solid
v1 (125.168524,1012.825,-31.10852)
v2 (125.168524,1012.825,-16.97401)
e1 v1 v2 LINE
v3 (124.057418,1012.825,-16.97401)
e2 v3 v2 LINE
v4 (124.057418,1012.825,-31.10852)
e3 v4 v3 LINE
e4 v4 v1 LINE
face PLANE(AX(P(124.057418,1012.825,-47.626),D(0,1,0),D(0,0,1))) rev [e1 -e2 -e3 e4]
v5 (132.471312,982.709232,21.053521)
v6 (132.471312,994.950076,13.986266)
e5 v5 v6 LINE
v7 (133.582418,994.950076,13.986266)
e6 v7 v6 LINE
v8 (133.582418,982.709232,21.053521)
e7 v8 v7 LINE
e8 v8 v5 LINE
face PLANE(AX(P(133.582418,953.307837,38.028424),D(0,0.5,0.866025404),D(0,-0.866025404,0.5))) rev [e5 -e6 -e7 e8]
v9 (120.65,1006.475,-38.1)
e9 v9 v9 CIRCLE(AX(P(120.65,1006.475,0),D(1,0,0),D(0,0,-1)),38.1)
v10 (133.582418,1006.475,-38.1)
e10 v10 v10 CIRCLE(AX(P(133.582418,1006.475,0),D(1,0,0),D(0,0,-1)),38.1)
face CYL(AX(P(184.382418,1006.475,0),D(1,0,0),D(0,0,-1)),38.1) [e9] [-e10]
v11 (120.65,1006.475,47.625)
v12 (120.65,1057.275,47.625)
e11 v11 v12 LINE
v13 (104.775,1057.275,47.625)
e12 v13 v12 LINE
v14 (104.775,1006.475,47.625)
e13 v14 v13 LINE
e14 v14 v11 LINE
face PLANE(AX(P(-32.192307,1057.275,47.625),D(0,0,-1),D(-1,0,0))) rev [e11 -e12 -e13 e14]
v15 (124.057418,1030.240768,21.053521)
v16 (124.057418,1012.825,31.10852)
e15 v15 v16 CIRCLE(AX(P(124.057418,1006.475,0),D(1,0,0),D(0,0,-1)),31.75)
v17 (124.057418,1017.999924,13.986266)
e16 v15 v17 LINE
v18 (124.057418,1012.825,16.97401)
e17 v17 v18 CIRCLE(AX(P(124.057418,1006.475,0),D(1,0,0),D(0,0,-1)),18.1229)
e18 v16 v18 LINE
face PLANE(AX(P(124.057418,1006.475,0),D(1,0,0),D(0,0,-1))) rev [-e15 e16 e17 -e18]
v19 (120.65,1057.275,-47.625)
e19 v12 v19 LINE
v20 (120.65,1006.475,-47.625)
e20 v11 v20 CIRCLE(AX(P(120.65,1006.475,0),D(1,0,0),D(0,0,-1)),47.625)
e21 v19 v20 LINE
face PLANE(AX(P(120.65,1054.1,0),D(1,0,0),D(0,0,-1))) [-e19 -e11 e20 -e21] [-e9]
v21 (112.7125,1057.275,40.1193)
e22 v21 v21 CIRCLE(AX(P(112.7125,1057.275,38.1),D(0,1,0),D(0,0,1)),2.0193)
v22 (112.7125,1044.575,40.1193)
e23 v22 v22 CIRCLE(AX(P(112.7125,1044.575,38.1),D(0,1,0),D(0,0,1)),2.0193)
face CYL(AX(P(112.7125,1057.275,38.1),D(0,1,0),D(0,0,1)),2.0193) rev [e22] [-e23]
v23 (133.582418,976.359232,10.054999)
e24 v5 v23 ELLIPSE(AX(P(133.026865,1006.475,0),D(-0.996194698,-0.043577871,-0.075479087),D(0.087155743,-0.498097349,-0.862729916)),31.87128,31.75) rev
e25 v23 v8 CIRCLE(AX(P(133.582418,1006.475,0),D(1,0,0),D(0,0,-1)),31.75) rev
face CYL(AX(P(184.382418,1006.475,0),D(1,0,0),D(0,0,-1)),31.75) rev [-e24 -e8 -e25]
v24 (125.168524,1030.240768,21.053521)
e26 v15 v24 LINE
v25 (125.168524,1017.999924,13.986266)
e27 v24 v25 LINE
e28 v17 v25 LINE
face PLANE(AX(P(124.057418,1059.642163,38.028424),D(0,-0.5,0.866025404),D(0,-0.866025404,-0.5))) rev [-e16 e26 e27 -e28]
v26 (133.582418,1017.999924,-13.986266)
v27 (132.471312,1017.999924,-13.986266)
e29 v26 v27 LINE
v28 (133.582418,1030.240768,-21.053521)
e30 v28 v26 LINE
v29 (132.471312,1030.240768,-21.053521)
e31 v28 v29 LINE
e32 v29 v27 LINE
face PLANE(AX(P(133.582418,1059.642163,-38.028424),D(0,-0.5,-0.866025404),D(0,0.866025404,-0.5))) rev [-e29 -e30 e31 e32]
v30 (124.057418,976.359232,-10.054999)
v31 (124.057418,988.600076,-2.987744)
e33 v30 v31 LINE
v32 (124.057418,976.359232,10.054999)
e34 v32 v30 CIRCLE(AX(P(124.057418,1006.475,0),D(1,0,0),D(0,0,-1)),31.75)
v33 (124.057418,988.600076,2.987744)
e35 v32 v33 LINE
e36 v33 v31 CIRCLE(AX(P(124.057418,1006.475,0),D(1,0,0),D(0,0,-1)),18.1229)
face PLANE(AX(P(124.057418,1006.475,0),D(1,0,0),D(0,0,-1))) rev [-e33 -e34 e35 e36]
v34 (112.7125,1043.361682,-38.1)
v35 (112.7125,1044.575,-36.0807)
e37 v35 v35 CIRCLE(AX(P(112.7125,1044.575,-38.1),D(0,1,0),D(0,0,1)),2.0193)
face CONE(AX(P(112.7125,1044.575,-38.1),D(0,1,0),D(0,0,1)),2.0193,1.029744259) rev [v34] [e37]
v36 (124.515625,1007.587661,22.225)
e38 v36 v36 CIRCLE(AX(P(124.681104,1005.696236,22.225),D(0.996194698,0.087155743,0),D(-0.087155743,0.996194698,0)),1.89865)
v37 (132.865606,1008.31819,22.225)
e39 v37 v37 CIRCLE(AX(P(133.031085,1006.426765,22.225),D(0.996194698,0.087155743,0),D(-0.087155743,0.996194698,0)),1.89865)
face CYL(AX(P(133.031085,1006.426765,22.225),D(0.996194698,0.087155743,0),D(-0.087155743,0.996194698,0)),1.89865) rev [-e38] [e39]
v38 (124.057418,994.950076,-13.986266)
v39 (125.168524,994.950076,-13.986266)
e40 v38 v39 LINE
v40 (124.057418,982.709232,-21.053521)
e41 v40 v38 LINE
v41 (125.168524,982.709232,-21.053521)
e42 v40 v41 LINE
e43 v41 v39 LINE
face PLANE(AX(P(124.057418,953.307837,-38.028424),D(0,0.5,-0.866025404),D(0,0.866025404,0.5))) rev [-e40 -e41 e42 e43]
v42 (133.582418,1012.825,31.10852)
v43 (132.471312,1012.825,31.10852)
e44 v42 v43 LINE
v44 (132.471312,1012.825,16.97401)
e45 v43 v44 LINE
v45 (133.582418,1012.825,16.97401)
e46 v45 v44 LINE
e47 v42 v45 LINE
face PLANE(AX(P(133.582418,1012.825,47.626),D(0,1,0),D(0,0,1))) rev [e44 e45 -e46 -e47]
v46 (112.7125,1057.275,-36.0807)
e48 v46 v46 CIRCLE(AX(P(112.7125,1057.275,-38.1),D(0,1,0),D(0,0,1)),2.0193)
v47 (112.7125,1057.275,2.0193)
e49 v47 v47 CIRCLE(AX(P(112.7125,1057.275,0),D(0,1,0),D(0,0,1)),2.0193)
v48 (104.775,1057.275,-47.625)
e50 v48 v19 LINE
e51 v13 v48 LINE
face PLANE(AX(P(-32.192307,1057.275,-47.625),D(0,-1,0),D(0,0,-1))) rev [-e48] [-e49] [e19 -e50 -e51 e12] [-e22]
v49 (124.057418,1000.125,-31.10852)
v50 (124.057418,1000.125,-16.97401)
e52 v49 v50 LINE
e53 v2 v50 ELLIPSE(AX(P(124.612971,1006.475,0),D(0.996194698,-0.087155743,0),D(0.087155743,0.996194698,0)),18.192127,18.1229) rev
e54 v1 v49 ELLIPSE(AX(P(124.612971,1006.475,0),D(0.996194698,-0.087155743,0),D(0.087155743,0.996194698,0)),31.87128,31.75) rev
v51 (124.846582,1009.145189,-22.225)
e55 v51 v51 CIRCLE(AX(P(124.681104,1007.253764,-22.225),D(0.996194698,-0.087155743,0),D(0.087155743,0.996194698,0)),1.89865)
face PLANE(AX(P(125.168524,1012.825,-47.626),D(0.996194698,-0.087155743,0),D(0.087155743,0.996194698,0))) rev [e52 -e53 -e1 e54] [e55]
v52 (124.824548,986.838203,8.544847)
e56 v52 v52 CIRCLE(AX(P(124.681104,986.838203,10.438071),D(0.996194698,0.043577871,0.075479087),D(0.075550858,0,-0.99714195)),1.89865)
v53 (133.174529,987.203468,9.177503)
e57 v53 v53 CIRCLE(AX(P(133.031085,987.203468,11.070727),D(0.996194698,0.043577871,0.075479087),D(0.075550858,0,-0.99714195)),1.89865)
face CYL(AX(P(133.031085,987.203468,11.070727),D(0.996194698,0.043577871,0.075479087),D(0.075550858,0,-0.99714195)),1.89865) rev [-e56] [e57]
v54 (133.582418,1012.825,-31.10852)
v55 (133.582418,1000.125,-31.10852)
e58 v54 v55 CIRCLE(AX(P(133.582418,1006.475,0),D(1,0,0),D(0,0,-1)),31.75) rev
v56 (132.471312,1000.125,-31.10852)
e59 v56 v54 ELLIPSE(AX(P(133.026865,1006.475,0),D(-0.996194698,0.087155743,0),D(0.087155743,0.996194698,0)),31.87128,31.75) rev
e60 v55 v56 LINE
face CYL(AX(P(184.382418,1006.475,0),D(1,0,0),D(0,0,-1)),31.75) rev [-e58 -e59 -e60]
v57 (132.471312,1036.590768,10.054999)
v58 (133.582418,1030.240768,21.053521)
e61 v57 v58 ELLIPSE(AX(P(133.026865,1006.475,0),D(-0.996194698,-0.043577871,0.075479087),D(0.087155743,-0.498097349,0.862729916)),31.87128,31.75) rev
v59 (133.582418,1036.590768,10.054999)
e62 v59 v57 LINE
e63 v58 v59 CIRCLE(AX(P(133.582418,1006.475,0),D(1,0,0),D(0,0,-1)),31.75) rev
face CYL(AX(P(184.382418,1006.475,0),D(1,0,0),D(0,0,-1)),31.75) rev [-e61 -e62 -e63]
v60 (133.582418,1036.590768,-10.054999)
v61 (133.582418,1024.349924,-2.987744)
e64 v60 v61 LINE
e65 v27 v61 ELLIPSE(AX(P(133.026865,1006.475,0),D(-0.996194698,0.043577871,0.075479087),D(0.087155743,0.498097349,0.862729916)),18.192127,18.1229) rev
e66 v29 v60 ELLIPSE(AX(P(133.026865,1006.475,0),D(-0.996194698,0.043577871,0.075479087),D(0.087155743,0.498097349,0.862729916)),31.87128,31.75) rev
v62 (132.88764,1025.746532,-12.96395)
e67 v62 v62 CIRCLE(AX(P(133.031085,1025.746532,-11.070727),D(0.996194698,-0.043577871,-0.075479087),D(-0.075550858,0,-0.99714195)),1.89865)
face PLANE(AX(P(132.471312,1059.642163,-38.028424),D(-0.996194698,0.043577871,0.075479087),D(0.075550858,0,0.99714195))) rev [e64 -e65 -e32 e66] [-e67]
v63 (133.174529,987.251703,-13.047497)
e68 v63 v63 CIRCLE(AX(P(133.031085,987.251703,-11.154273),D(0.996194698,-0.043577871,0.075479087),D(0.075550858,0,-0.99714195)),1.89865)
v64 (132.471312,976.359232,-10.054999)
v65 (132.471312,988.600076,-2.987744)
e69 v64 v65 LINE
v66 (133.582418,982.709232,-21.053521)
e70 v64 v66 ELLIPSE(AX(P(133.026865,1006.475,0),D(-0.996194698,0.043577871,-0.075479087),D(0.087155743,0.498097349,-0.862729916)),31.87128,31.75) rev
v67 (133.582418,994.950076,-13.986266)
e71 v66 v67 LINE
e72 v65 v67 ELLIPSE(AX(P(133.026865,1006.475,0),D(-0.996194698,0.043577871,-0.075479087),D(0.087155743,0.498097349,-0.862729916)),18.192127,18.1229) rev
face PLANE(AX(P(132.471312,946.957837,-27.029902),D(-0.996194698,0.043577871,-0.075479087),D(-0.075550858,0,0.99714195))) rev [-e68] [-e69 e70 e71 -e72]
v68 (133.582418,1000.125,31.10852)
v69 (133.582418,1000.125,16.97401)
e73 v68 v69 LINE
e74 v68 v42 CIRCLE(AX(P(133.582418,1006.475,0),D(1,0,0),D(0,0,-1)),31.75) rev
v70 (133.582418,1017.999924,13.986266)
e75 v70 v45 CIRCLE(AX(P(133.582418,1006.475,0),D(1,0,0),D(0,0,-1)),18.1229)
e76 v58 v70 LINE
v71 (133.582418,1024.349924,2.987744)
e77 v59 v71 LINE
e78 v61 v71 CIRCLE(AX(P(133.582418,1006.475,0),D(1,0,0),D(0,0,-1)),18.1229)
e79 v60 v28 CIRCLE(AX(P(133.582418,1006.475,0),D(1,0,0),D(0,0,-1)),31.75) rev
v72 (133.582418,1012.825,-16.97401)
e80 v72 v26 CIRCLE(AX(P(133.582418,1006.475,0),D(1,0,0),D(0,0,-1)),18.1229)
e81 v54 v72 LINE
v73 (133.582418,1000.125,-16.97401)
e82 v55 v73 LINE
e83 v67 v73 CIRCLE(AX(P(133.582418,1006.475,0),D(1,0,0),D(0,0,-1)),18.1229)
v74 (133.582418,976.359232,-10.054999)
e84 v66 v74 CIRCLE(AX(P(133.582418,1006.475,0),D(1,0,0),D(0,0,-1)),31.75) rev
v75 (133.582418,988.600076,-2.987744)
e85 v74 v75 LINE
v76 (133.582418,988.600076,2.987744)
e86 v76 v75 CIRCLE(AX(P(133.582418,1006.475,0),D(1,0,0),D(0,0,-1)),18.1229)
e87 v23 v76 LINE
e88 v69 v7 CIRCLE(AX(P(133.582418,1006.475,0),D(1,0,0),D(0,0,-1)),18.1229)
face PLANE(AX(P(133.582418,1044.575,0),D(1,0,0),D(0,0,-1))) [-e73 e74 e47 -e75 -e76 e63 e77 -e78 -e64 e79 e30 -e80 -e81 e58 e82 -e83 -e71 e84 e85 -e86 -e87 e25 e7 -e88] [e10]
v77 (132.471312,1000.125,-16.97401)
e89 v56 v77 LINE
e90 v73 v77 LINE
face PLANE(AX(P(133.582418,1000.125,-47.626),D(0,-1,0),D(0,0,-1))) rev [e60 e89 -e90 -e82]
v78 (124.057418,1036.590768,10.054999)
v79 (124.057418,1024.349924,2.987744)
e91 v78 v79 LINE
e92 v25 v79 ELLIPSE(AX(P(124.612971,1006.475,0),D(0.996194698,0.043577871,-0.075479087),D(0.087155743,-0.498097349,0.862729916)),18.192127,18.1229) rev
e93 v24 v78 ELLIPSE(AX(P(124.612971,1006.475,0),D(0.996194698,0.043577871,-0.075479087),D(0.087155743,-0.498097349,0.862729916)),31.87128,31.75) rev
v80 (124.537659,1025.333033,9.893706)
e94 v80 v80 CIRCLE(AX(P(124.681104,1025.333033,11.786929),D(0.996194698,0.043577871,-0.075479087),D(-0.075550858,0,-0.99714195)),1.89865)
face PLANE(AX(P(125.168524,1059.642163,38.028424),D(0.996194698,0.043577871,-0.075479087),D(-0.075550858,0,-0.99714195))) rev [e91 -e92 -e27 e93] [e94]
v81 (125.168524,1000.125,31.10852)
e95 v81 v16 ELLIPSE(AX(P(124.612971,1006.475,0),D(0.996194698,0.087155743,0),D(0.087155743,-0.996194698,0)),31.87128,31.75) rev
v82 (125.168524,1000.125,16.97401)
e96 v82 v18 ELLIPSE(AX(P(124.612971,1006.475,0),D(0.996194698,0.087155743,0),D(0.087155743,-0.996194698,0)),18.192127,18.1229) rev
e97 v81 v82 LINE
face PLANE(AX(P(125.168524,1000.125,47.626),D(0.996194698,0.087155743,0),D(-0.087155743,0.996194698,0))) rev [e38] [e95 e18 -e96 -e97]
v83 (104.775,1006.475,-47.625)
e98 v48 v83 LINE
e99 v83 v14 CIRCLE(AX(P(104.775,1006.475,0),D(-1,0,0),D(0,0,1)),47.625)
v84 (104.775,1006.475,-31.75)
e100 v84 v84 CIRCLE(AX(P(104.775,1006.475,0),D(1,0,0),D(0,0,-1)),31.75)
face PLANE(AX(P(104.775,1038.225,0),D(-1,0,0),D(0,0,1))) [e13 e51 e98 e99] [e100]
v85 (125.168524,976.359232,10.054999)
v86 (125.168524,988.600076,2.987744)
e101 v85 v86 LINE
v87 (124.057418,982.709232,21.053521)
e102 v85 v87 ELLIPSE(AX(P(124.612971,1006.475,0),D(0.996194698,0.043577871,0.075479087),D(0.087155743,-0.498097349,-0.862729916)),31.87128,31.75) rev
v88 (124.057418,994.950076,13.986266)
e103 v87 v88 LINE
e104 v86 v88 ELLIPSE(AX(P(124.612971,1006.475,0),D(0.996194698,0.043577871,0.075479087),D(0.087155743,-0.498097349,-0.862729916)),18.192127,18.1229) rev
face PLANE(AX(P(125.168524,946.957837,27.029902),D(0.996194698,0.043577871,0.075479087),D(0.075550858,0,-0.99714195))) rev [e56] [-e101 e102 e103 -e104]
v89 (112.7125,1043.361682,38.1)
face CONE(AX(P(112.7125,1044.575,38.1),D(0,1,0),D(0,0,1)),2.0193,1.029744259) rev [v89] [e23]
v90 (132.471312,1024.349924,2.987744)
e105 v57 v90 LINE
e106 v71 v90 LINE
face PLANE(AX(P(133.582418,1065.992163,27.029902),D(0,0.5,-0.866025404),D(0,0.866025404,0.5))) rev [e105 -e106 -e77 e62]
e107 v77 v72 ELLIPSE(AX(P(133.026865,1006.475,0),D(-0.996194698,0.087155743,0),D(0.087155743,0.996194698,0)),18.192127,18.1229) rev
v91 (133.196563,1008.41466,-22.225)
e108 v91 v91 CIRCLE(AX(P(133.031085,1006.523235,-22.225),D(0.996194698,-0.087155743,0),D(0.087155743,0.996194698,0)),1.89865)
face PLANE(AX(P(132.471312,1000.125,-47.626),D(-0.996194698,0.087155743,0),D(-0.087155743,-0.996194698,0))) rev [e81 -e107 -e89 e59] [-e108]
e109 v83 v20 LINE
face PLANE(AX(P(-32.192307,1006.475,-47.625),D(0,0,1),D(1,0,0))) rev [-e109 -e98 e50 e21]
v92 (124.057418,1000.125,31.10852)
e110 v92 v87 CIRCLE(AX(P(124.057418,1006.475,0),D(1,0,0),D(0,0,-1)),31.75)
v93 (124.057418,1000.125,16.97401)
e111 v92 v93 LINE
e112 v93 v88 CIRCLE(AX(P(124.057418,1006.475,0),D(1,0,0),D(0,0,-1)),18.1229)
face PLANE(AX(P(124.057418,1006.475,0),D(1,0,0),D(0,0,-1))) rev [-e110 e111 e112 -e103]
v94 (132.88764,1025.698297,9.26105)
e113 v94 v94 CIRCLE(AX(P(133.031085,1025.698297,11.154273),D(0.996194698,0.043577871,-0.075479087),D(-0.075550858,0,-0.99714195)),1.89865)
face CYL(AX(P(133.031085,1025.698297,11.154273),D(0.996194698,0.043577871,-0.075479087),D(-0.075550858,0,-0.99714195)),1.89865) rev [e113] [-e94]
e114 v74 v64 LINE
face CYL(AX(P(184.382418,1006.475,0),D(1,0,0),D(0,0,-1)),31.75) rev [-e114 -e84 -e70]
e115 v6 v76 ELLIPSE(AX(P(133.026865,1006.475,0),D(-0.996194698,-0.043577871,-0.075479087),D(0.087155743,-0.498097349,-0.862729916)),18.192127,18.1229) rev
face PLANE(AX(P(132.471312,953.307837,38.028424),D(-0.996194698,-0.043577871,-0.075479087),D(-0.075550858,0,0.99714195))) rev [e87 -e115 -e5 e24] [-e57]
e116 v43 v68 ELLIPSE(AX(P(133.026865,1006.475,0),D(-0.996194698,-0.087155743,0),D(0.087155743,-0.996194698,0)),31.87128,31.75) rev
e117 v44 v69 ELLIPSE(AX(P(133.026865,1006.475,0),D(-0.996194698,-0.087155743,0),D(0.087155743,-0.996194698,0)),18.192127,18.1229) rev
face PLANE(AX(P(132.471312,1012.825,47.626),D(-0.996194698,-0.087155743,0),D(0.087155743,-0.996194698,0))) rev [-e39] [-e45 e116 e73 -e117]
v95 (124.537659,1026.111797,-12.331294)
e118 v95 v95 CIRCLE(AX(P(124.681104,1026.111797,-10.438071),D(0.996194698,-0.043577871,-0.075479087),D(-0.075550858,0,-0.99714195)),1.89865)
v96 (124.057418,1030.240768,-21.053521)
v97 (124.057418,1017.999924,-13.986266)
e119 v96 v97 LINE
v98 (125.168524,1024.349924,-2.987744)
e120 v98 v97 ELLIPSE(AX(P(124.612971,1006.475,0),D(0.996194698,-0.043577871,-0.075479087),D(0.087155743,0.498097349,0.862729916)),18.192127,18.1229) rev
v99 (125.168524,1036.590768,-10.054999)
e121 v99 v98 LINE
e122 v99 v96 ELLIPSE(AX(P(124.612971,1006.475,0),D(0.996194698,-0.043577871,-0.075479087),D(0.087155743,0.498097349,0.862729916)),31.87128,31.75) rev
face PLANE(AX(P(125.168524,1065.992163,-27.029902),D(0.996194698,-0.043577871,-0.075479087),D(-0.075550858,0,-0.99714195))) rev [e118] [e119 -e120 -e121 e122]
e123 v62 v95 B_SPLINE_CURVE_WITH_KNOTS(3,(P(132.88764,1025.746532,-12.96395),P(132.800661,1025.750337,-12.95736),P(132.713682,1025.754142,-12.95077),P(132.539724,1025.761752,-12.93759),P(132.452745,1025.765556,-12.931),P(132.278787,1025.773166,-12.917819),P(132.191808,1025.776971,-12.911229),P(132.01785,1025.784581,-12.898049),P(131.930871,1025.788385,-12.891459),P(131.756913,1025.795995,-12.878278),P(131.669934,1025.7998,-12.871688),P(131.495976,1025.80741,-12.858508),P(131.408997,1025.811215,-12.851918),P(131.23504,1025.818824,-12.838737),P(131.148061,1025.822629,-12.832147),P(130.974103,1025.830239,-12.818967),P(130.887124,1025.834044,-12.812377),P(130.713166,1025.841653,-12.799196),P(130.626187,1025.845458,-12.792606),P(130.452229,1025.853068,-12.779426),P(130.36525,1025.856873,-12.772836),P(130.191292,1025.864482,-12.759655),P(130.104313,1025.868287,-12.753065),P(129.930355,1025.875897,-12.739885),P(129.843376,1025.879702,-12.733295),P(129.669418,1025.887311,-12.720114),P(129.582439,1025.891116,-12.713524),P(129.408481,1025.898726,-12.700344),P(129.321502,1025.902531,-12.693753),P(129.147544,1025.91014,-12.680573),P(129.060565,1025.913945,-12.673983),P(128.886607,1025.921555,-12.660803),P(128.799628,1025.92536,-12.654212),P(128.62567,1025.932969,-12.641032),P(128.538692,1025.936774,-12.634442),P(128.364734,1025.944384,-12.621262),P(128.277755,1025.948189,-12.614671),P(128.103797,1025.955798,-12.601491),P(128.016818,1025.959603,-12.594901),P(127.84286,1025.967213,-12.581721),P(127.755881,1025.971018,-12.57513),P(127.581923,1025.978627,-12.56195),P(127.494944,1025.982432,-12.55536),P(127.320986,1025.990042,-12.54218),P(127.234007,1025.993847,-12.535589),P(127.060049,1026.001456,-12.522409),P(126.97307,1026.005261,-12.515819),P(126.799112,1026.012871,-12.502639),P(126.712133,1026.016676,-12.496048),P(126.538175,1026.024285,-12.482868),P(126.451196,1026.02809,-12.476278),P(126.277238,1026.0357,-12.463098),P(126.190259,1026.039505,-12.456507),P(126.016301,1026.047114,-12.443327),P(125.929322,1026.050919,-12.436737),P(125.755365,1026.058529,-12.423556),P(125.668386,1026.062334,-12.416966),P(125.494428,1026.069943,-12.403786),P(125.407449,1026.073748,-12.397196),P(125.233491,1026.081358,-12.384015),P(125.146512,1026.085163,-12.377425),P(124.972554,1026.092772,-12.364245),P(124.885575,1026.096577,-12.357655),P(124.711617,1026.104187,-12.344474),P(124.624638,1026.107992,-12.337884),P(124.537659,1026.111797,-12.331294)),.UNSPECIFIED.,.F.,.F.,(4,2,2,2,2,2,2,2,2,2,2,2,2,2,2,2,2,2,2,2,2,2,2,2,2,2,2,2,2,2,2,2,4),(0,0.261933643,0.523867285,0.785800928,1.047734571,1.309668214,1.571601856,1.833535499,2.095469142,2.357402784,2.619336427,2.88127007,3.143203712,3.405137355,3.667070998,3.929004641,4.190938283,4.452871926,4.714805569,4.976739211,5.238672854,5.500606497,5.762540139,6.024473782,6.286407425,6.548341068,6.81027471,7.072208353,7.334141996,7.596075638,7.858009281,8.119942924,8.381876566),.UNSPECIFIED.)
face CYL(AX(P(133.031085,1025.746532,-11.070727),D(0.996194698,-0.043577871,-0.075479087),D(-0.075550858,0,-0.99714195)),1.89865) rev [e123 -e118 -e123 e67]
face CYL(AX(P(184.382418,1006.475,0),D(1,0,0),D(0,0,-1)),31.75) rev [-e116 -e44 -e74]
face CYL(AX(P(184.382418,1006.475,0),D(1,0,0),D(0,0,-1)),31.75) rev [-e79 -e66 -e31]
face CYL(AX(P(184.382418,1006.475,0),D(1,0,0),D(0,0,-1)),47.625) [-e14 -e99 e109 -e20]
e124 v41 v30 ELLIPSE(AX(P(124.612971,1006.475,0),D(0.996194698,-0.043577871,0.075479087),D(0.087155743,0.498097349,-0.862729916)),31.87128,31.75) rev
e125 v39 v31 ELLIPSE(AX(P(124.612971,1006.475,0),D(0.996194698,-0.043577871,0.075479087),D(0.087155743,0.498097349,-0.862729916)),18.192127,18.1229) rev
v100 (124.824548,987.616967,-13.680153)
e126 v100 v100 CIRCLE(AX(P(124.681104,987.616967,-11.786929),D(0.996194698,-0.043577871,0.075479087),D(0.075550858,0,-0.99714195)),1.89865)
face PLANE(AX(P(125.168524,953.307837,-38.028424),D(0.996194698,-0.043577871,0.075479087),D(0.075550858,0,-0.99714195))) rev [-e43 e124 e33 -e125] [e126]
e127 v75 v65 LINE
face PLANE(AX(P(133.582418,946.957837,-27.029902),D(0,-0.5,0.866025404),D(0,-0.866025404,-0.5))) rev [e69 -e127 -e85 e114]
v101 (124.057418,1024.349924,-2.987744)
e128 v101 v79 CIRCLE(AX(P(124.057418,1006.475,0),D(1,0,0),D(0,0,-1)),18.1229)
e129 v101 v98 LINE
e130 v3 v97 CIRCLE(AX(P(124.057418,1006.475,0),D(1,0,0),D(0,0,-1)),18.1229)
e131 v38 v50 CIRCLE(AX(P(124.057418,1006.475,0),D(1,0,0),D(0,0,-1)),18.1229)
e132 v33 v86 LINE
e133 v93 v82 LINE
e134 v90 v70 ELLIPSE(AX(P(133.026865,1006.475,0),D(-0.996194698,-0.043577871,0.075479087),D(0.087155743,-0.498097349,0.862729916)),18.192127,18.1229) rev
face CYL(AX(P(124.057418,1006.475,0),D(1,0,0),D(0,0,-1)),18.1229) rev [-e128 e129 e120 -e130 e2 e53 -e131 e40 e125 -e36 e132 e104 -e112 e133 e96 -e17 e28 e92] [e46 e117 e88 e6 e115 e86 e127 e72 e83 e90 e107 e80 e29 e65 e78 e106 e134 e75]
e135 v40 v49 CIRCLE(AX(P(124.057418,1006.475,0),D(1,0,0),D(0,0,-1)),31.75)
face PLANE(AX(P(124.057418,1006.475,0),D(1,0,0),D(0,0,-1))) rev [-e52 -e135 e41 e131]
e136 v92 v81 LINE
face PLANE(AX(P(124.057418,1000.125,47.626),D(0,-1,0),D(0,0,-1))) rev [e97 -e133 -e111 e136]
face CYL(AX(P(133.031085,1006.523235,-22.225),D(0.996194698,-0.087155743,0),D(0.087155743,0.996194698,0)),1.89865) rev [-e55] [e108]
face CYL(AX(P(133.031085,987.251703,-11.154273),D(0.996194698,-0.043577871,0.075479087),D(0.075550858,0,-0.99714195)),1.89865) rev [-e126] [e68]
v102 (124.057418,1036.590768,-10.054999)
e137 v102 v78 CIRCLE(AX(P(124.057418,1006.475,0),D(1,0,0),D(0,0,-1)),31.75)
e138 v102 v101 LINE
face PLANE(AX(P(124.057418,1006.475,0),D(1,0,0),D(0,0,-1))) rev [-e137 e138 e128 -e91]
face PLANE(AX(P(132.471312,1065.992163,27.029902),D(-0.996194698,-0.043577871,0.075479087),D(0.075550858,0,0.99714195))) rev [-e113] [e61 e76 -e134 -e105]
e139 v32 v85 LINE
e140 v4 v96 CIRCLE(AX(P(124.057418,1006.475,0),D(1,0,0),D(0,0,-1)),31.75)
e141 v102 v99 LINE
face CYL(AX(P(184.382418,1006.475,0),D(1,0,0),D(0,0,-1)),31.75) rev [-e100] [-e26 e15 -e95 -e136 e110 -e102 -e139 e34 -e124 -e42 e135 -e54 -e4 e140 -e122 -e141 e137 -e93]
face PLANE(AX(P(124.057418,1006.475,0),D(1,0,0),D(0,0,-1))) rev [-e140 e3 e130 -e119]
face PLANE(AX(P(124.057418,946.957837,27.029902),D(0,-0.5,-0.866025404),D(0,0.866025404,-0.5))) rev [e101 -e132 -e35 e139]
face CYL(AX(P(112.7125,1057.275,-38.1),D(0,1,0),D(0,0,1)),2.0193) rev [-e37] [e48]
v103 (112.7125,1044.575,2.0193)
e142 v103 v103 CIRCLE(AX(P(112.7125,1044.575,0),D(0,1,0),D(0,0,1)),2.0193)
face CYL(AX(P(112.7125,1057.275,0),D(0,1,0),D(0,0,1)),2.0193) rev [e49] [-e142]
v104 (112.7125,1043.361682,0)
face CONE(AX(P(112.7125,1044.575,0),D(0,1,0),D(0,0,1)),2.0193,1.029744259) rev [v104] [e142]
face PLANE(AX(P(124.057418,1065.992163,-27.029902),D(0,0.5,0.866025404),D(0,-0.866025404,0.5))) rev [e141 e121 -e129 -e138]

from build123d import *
from build123d.topology import SkipClean

# Parameters (mm, degrees)
SKETCH7_R                  = 38.1
SKETCH7_R_2                = 18.1229
BOSS_EXTRUDE3_DEPTH        = 9.525
CUT_EXTRUDE4_REACH         = 1065.597
CUT_EXTRUDE4_END_RADIUS    = 31.75
CIRPATTERN1_COUNT          = 6
SKETCH19_R                 = 38.1
BOSS_EXTRUDE4_DEPTH        = 15.875
F_10_32_TAPPED_HOLE1_D     = 4.0386
F_10_32_TAPPED_HOLE1_DEPTH = 12.7
F_10_32_TAPPED_HOLE1_TIP   = 1.213317848


with BuildPart() as part:
    # Sketch1 → Revolve1 (revolve)
    with BuildSketch(Plane.XY, mode=Mode.PRIVATE) as revolve1_sk:
        Polygon((104.775, 1038.225), (104.775, 1044.575), (114.3, 1044.575), (114.3, 1054.1), (120.65, 1054.1), (120.65, 1044.575), (133.582417551, 1044.575), (133.582417551, 1038.225), align=None)
    revolve(revolve1_sk.sketch.rotate(Axis((184.382417551, 1006.475, 0), (-1, 0, 0)), 90), axis=Axis((184.382417551, 1006.475, 0), (-1, 0, 0)))

    # Sketch7 → Boss-Extrude3 (add)
    with BuildSketch(Plane(origin=(133.582417551, 0, 0), x_dir=(0, 0, -1), z_dir=(1, 0, 0))):
        with Locations((0, 1006.475)):
            Circle(SKETCH7_R)
        with Locations((0, 1006.475)):
            Circle(SKETCH7_R_2, mode=Mode.SUBTRACT)
    extrude(amount=-BOSS_EXTRUDE3_DEPTH)

    # Cut-Extrude4: up to this cylinder (the profile starts inside it)
    cut_extrude4_end = Plane(origin=(128.8199175, 1006.475, 0), z_dir=(1, 0, 0)) * Cylinder(CUT_EXTRUDE4_END_RADIUS, 2204.478263, mode=Mode.PRIVATE)
    # Sketch8 → Cut-Extrude4 (cut, up to the surface)
    with BuildSketch(Plane.XY, mode=Mode.PRIVATE) as cut_extrude4_sk1:
        Polygon((133.582417551, 1000.125), (133.582417551, 1012.825), (132.471311524, 1000.125), align=None)
    cut_extrude4_tool1 = extrude(cut_extrude4_sk1.sketch, amount=-CUT_EXTRUDE4_REACH, mode=Mode.PRIVATE) & cut_extrude4_end
    # Sketch8 → Cut-Extrude4 (cut, up to the surface)
    with BuildSketch(Plane.XY, mode=Mode.PRIVATE) as cut_extrude4_sk2:
        Polygon((124.057417551, 1012.825), (124.057417551, 1000.125), (125.168523578, 1012.825), align=None)
    cut_extrude4_tool2 = extrude(cut_extrude4_sk2.sketch, amount=-CUT_EXTRUDE4_REACH, mode=Mode.PRIVATE) & cut_extrude4_end
    cut_extrude4 = cut_extrude4_tool1.solids().sort_by_distance((133.212049, 1004.358333, 0))[0] + cut_extrude4_tool2.solids().sort_by_distance((124.427786, 1008.591667, 0))[0]
    add(cut_extrude4, mode=Mode.SUBTRACT)

    # Sketch18 → #10-24 Tapped Hole2 (revolve, cut)
    with BuildSketch(Plane(origin=(133.031084587, 1006.523235384, -22.225), x_dir=(0.08715574274765736, 0.9961946980917457, 0), z_dir=(0, 0, 1))):
        Polygon((0, 0), (0, 16.126824014), (1.89865, 14.986), (1.89865, 0), align=None)
    f_10_24_tapped_hole2 = revolve(axis=Axis((139.35692092, 1005.969796418, -22.225), (-0.9961946980917457, 0.08715574274765729, 0)), mode=Mode.SUBTRACT)

    # CirPattern1: Cut-Extrude4, #10-24 Tapped Hole2 ×6 about axis
    with SkipClean():  # the faces are left unmerged after this step: merging them gives an invalid solid
        cirpattern1_axis = Axis((0, 1006.475, 0), (1, 0, 0))
        add([cut_extrude4.rotate(cirpattern1_axis, i * 360 / CIRPATTERN1_COUNT) for i in range(1, CIRPATTERN1_COUNT)], mode=Mode.SUBTRACT)
        add([f_10_24_tapped_hole2.rotate(cirpattern1_axis, i * 360 / CIRPATTERN1_COUNT) for i in range(1, CIRPATTERN1_COUNT)], mode=Mode.SUBTRACT)
    add(part.part.scale(1), mode=Mode.REPLACE)  # the faces are merged on a copy

    # Sketch19 → Boss-Extrude4 (add)
    with SkipClean():  # the faces are left unmerged after this step: merging them gives an invalid solid
        with BuildSketch(Plane.ZY.offset(-120.65)):
            with BuildLine():
                Line((-47.625, 1006.475), (-47.625, 1057.275))
                Line((-47.625, 1057.275), (47.625, 1057.275))
                Line((47.625, 1057.275), (47.625, 1006.475))
                ThreePointArc((47.625, 1006.475), (0, 958.85), (-47.625, 1006.475))
            make_face()
            with Locations(Location((0, 1006.475, 0), (0, 0, 180))):
                Circle(SKETCH19_R, mode=Mode.SUBTRACT)
        extrude(amount=BOSS_EXTRUDE4_DEPTH)

    # #10-32 Tapped Hole1
    with Locations(Plane(origin=(0, 1057.275, 0), x_dir=(1, 0, 0), z_dir=(0, 1, 0))):
        with Locations((112.7125, 38.1), (112.7125, 0), (112.7125, -38.1)):
            Hole(F_10_32_TAPPED_HOLE1_D / 2, depth=F_10_32_TAPPED_HOLE1_DEPTH)
            with Locations((0, 0, -(F_10_32_TAPPED_HOLE1_DEPTH + F_10_32_TAPPED_HOLE1_TIP / 2))):  # 118° drill point
                Cone(0, F_10_32_TAPPED_HOLE1_D / 2, F_10_32_TAPPED_HOLE1_TIP, mode=Mode.SUBTRACT)


solid = part.part
